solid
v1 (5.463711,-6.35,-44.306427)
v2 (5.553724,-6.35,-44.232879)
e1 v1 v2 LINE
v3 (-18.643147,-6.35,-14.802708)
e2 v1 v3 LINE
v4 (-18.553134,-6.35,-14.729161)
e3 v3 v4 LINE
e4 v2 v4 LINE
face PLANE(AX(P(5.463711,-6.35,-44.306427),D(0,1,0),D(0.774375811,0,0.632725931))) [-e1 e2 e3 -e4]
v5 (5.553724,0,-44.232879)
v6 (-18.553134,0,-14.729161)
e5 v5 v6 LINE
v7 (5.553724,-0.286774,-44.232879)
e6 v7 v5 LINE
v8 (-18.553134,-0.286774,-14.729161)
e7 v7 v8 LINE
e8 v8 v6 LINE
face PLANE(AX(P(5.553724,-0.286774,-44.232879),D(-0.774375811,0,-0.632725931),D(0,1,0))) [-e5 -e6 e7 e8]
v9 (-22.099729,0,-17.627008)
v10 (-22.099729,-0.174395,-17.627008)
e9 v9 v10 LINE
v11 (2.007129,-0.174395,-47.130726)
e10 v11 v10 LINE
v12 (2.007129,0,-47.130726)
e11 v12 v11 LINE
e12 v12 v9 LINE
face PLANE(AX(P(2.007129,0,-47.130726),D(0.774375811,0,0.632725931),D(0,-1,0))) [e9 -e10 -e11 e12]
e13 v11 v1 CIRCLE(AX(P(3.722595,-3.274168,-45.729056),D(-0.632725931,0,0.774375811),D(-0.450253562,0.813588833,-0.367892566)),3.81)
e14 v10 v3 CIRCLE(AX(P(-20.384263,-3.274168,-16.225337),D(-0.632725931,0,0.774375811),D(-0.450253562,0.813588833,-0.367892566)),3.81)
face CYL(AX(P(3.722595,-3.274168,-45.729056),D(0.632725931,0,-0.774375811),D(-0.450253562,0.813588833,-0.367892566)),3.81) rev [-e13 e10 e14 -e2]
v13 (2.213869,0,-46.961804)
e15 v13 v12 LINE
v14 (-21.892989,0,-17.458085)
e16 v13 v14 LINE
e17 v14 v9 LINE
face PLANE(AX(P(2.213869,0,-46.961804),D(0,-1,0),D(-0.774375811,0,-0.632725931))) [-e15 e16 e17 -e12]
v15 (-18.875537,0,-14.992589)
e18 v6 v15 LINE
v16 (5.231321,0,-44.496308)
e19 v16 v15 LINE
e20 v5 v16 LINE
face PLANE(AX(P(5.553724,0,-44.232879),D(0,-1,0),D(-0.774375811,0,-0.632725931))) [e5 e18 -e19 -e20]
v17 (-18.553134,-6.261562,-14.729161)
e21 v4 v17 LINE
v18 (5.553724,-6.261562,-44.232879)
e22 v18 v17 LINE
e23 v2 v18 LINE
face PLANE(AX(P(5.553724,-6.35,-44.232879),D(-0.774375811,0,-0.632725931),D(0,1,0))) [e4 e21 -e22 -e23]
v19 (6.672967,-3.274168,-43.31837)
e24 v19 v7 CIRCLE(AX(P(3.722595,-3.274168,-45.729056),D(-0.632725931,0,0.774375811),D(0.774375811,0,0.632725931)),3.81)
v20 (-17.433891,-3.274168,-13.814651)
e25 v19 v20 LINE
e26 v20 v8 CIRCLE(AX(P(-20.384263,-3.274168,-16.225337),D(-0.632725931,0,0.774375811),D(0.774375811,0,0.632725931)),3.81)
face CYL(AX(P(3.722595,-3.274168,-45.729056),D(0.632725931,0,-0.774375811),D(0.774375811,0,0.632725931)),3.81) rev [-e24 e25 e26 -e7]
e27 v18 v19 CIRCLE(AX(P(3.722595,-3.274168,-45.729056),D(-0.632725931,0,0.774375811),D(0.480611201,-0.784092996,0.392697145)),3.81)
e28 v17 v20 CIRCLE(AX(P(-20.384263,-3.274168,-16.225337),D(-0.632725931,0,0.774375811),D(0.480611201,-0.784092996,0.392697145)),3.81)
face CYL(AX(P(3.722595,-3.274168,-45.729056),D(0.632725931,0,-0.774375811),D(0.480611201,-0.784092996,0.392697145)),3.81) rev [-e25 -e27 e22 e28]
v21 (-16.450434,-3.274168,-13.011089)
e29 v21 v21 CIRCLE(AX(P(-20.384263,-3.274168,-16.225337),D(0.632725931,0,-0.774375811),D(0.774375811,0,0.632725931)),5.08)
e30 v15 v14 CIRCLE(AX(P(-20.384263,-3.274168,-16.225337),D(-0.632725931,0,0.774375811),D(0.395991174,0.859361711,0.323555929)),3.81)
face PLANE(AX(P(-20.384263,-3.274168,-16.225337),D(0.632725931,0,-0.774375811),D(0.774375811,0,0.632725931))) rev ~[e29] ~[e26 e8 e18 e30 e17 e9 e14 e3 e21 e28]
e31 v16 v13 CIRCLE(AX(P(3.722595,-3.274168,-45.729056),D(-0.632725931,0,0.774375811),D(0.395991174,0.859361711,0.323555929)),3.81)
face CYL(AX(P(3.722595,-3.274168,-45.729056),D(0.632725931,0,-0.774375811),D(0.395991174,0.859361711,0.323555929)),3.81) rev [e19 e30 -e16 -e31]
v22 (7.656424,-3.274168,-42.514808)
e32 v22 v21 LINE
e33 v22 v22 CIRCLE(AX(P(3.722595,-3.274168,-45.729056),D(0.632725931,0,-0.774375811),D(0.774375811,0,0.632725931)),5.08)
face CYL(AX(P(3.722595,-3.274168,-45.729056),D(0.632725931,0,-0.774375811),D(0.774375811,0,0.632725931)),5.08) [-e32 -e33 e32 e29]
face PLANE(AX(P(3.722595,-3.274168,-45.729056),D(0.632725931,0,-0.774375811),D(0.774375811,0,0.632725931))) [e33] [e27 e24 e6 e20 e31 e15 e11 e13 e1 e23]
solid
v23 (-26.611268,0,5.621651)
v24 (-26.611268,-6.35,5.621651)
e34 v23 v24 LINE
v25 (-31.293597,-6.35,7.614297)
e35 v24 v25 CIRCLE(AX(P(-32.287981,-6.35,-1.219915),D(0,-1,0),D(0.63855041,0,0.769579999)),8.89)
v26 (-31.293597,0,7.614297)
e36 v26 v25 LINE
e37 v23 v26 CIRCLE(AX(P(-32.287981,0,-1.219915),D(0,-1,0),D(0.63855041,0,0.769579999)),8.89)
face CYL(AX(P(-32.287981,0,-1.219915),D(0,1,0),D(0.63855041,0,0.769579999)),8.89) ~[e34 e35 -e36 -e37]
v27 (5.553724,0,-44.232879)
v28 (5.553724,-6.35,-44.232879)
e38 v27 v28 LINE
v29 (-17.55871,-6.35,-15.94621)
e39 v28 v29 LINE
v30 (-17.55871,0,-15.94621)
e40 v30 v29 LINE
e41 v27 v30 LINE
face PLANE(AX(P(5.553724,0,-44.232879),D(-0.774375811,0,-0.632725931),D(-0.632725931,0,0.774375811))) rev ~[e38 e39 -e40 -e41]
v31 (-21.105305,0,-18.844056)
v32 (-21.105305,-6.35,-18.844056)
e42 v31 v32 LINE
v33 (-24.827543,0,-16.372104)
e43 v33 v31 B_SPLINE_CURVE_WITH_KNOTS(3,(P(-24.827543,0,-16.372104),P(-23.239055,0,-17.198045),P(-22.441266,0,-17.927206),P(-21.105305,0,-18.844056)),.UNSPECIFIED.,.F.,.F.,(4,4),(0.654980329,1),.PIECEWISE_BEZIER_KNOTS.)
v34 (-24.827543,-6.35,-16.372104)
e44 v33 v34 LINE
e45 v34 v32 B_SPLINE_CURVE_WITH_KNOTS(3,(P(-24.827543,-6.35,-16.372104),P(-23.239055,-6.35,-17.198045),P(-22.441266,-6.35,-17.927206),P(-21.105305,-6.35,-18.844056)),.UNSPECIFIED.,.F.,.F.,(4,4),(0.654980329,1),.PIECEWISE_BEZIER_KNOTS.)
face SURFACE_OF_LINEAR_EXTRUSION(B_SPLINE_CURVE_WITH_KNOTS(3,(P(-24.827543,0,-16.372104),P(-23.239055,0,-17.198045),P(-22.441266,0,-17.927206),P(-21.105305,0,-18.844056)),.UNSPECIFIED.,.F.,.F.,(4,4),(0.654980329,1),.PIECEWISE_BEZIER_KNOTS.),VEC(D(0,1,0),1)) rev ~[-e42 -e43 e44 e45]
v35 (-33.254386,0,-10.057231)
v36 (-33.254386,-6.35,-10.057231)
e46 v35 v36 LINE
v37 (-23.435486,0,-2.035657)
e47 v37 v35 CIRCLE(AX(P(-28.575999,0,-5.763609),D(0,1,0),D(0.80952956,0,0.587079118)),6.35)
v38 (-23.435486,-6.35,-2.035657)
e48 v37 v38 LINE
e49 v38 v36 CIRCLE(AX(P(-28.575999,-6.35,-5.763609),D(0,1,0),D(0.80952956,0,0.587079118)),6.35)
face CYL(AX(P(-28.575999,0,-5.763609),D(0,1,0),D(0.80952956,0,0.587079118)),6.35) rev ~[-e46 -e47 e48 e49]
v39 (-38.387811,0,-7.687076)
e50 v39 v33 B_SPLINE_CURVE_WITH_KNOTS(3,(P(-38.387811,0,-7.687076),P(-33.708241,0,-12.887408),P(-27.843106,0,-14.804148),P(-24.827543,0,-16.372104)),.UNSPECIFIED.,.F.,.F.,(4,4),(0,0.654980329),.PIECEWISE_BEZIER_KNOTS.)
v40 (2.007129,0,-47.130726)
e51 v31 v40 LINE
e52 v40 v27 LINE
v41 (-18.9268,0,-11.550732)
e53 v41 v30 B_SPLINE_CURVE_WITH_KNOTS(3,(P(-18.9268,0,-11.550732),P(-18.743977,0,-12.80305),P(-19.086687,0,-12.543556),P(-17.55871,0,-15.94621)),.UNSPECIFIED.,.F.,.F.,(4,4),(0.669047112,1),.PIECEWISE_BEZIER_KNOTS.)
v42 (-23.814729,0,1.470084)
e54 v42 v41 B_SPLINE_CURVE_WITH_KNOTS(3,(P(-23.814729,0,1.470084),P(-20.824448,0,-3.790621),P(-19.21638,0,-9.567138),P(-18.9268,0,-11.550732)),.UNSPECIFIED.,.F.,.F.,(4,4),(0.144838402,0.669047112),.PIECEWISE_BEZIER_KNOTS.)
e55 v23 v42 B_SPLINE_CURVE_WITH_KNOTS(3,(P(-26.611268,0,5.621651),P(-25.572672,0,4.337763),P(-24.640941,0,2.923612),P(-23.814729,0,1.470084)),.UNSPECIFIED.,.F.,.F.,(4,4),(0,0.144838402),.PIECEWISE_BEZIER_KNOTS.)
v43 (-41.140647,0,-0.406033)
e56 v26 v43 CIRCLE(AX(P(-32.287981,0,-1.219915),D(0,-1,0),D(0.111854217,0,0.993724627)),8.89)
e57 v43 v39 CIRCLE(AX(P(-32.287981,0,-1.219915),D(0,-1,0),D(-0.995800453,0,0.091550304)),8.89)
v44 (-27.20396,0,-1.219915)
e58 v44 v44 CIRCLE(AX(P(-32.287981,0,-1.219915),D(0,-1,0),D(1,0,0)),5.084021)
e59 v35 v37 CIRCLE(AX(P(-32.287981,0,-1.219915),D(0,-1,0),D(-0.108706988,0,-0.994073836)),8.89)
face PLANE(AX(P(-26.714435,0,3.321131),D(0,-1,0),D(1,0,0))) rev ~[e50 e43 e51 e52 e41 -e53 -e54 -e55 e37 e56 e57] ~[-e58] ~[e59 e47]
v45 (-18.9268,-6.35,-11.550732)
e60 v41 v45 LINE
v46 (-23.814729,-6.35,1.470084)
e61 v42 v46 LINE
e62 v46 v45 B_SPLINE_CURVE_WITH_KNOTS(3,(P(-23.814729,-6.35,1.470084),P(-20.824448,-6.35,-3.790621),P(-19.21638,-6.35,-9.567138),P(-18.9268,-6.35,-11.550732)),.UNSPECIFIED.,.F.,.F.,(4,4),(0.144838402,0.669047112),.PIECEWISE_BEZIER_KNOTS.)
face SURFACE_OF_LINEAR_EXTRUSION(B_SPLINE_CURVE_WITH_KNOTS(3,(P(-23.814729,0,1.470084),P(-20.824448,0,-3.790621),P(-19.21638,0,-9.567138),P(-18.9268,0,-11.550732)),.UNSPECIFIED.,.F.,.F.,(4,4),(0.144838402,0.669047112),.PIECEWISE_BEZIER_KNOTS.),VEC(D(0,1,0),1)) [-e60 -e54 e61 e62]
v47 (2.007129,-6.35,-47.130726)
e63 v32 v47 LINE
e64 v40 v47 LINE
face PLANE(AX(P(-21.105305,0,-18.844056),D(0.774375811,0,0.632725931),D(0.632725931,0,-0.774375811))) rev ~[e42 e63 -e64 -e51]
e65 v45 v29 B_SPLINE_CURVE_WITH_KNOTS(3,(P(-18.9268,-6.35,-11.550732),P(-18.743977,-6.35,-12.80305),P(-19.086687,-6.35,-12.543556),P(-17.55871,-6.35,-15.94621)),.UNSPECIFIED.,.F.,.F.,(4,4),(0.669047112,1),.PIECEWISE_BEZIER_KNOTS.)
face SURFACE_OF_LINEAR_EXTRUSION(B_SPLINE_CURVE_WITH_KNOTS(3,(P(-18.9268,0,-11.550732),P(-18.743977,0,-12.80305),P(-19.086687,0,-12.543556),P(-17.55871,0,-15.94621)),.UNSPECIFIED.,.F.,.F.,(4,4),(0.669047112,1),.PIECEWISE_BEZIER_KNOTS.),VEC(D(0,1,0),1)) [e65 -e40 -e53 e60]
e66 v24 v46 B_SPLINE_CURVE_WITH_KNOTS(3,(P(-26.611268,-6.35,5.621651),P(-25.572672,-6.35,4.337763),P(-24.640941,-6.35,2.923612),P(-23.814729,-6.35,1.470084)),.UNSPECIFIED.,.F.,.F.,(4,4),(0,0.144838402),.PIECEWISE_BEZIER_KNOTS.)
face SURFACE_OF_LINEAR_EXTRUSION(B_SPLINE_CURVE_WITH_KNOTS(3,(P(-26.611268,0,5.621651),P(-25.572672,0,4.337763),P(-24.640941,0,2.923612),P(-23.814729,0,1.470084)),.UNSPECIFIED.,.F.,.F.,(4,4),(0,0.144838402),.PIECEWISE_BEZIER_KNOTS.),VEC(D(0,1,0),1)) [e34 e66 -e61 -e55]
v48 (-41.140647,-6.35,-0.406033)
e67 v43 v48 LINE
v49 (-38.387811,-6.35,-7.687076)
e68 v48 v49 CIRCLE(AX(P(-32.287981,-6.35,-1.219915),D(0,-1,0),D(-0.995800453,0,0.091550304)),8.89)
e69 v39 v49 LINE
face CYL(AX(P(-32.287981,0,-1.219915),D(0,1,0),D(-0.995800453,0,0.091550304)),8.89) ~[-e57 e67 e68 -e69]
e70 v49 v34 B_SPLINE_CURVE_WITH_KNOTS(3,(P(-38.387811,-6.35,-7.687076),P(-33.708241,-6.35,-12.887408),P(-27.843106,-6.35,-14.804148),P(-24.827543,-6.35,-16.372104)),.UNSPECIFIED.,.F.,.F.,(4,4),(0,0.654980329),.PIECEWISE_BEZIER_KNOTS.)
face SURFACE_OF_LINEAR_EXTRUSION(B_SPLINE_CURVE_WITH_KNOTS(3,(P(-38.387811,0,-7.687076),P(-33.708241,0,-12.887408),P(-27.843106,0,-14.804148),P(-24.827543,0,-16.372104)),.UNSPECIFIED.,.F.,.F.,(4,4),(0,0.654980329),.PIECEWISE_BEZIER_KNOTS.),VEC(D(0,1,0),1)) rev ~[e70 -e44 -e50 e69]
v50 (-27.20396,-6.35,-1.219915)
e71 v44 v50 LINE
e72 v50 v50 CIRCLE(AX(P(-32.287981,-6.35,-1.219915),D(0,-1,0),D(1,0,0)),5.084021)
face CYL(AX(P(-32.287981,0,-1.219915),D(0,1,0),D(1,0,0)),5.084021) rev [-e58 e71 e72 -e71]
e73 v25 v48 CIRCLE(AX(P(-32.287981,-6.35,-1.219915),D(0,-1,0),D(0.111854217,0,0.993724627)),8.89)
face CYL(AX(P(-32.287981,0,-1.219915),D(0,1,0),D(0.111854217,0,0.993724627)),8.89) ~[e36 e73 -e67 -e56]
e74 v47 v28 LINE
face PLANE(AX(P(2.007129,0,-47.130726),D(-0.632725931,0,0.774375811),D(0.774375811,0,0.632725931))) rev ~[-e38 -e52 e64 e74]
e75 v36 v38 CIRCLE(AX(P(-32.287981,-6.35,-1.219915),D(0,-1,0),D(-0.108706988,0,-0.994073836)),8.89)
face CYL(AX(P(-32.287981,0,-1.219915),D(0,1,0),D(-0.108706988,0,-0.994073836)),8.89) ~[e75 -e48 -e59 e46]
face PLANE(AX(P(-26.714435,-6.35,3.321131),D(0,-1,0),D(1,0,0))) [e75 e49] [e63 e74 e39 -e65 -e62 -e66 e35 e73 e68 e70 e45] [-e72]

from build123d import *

# Parameters (mm, degrees)
F1_R     = 5.084021356
F2_DEPTH = 6.35
F3_R     = 5.08
F4_DEPTH = 38.1


with BuildPart() as f2:
    # F1 (on face) → F2 (new body)
    with BuildSketch(Plane.XZ):
        with BuildLine():
            ThreePointArc((-23.435486266, -2.0356566424), (-23.4073623703, -1.6282166531), (-23.3979811386, -1.2199149375))
            ThreePointArc((-23.3979811386, -1.2199149375), (-23.502785805, 0.1411298632), (-23.8147287088, 1.4700838098))
            add(Edge.make_bspline(
                [(-26.6112679949, 5.621651249), (-25.5726723735, 4.3377625486), (-24.6409406575, 2.9236120143), (-23.8147287088, 1.4700838098)],
                knots=[0, 0, 0, 0, 0.1448384022, 0.1448384022, 0.1448384022, 0.1448384022], degree=3))
            ThreePointArc((-26.6112679949, 5.621651249), (-28.8068112918, 6.9601557527), (-31.2935971509, 7.6142969959))
            Line((-31.2935971509, 7.6142969959), (-23.6553535863, -1.7499138663))
            ThreePointArc((-23.6553535863, -1.7499138663), (-23.5433915196, -1.8912244789), (-23.435486266, -2.0356566424))
        make_face()
        with BuildLine():
            ThreePointArc((-23.8147287088, 1.4700838098), (-23.502785805, 0.1411298632), (-23.3979811386, -1.2199149375))
            ThreePointArc((-23.3979811386, -1.2199149375), (-23.4073623703, -1.6282166531), (-23.435486266, -2.0356566424))
            ThreePointArc((-23.435486266, -2.0356566424), (-24.5585613429, -10.6811993954), (-33.2543862597, -10.0572313368))
            ThreePointArc((-33.2543862597, -10.0572313368), (-36.0145517074, -9.2911460577), (-38.3878110502, -7.6870762197))
            add(Edge.make_bspline(
                [(-38.3878110502, -7.6870762197), (-33.7082410797, -12.8874080847), (-27.843105649, -14.8041480157), (-24.8275432116, -16.3721035764)],
                knots=[0, 0, 0, 0, 0.6549803292, 0.6549803292, 0.6549803292, 0.6549803292], degree=3))
            Line((-24.8275432116, -16.3721035764), (-18.9267995353, -11.5507319804))
            add(Edge.make_bspline(
                [(-23.8147287088, 1.4700838098), (-20.8244478634, -3.7906214549), (-19.2163795919, -9.5671382328), (-18.9267995353, -11.5507319804)],
                knots=[0.1448384022, 0.1448384022, 0.1448384022, 0.1448384022, 0.6690471122, 0.6690471122, 0.6690471122, 0.6690471122], degree=3))
        make_face()
        with BuildLine():
            ThreePointArc((-33.2543862597, -10.0572313368), (-26.6635684549, -8.1045414316), (-23.435486266, -2.0356566424))
            ThreePointArc((-23.435486266, -2.0356566424), (-23.5433915196, -1.8912244789), (-23.6553535863, -1.7499138663))
            Line((-23.6553535863, -1.7499138663), (-31.2935971509, 7.6142969959))
            ThreePointArc((-31.2935971509, 7.6142969959), (-37.9022105078, 5.6730182981), (-41.1406471645, -0.4060327385))
            Line((-41.1406471645, -0.4060327385), (-33.4966443619, -9.7773042187))
            ThreePointArc((-33.4966443619, -9.7773042187), (-33.3775556867, -9.9190335859), (-33.2543862597, -10.0572313368))
        make_face()
        with Locations((-32.2879811386, -1.2199149375)):
            Circle(F1_R, mode=Mode.SUBTRACT)
        with BuildLine():
            add(Edge.make_bspline(
                [(-18.9267995353, -11.5507319804), (-18.7439766364, -12.8030501249), (-19.0866869126, -12.5435558307), (-17.5587098689, -15.9462096301)],
                knots=[0.6690471122, 0.6690471122, 0.6690471122, 0.6690471122, 1, 1, 1, 1], degree=3))
            Line((-18.9267995353, -11.5507319804), (-24.8275432116, -16.3721035764))
            add(Edge.make_bspline(
                [(-24.8275432116, -16.3721035764), (-23.2390552632, -17.1980451921), (-22.4412659418, -17.9272062293), (-21.1053046157, -18.8440564292)],
                knots=[0.6549803292, 0.6549803292, 0.6549803292, 0.6549803292, 1, 1, 1, 1], degree=3))
            Line((-21.1053046157, -18.8440564292), (-17.5587098689, -15.9462096301))
        make_face()
        with BuildLine():
            ThreePointArc((-38.3878110502, -7.6870762197), (-36.0145517074, -9.2911460577), (-33.2543862597, -10.0572313368))
            ThreePointArc((-33.2543862597, -10.0572313368), (-33.3775556867, -9.9190335859), (-33.4966443619, -9.7773042187))
            Line((-33.4966443619, -9.7773042187), (-41.1406471645, -0.4060327385))
            ThreePointArc((-41.1406471645, -0.4060327385), (-40.6034896759, -4.3638643274), (-38.3878110502, -7.6870762197))
        make_face()
        Polygon((5.5537237598, -44.232879484), (-17.5587098689, -15.9462096301), (-21.1053046157, -18.8440564292), (2.007129013, -47.1307262831), align=None)
    extrude(amount=F2_DEPTH)


with BuildPart() as f4:
    # F3 (on face) → F4 (new body)
    with BuildSketch(Plane(origin=(23.8960697274, 0, -29.2457404549), x_dir=(0.7743758105, 0, 0.6327259312), z_dir=(0.6327259312, 0, -0.7743758105))):
        with Locations((-26.0512717068, 3.2741681207)):
            Circle(F3_R)
        with BuildLine():
            ThreePointArc((-23.6866205246, 6.2615624345), (-22.6215908904, 4.9335021732), (-22.2412717068, 3.2741681207))
            ThreePointArc((-22.2412717068, 3.2741681207), (-22.6215908904, 1.6148340682), (-23.6866205246, 0.2867738069))
            Line((-23.6866205246, 0.2867738069), (-23.6866205246, 0))
            Line((-23.6866205246, 0), (-24.1029588168, 0))
            ThreePointArc((-24.1029588168, 0), (-26.0512717068, -0.5358318793), (-27.9995845968, 0))
            Line((-27.9995845968, 0), (-28.2665605208, 0))
            Line((-28.2665605208, 0), (-28.2665605208, 0.174394666))
            ThreePointArc((-28.2665605208, 0.174394666), (-29.139118789, 5.506050823), (-23.8028593224, 6.35))
            Line((-23.8028593224, 6.35), (-23.6866205246, 6.35))
            Line((-23.6866205246, 6.35), (-23.6866205246, 6.2615624345))
        make_face(mode=Mode.SUBTRACT)
    extrude(amount=-F4_DEPTH)


solid = Compound([f2.part, f4.part])
